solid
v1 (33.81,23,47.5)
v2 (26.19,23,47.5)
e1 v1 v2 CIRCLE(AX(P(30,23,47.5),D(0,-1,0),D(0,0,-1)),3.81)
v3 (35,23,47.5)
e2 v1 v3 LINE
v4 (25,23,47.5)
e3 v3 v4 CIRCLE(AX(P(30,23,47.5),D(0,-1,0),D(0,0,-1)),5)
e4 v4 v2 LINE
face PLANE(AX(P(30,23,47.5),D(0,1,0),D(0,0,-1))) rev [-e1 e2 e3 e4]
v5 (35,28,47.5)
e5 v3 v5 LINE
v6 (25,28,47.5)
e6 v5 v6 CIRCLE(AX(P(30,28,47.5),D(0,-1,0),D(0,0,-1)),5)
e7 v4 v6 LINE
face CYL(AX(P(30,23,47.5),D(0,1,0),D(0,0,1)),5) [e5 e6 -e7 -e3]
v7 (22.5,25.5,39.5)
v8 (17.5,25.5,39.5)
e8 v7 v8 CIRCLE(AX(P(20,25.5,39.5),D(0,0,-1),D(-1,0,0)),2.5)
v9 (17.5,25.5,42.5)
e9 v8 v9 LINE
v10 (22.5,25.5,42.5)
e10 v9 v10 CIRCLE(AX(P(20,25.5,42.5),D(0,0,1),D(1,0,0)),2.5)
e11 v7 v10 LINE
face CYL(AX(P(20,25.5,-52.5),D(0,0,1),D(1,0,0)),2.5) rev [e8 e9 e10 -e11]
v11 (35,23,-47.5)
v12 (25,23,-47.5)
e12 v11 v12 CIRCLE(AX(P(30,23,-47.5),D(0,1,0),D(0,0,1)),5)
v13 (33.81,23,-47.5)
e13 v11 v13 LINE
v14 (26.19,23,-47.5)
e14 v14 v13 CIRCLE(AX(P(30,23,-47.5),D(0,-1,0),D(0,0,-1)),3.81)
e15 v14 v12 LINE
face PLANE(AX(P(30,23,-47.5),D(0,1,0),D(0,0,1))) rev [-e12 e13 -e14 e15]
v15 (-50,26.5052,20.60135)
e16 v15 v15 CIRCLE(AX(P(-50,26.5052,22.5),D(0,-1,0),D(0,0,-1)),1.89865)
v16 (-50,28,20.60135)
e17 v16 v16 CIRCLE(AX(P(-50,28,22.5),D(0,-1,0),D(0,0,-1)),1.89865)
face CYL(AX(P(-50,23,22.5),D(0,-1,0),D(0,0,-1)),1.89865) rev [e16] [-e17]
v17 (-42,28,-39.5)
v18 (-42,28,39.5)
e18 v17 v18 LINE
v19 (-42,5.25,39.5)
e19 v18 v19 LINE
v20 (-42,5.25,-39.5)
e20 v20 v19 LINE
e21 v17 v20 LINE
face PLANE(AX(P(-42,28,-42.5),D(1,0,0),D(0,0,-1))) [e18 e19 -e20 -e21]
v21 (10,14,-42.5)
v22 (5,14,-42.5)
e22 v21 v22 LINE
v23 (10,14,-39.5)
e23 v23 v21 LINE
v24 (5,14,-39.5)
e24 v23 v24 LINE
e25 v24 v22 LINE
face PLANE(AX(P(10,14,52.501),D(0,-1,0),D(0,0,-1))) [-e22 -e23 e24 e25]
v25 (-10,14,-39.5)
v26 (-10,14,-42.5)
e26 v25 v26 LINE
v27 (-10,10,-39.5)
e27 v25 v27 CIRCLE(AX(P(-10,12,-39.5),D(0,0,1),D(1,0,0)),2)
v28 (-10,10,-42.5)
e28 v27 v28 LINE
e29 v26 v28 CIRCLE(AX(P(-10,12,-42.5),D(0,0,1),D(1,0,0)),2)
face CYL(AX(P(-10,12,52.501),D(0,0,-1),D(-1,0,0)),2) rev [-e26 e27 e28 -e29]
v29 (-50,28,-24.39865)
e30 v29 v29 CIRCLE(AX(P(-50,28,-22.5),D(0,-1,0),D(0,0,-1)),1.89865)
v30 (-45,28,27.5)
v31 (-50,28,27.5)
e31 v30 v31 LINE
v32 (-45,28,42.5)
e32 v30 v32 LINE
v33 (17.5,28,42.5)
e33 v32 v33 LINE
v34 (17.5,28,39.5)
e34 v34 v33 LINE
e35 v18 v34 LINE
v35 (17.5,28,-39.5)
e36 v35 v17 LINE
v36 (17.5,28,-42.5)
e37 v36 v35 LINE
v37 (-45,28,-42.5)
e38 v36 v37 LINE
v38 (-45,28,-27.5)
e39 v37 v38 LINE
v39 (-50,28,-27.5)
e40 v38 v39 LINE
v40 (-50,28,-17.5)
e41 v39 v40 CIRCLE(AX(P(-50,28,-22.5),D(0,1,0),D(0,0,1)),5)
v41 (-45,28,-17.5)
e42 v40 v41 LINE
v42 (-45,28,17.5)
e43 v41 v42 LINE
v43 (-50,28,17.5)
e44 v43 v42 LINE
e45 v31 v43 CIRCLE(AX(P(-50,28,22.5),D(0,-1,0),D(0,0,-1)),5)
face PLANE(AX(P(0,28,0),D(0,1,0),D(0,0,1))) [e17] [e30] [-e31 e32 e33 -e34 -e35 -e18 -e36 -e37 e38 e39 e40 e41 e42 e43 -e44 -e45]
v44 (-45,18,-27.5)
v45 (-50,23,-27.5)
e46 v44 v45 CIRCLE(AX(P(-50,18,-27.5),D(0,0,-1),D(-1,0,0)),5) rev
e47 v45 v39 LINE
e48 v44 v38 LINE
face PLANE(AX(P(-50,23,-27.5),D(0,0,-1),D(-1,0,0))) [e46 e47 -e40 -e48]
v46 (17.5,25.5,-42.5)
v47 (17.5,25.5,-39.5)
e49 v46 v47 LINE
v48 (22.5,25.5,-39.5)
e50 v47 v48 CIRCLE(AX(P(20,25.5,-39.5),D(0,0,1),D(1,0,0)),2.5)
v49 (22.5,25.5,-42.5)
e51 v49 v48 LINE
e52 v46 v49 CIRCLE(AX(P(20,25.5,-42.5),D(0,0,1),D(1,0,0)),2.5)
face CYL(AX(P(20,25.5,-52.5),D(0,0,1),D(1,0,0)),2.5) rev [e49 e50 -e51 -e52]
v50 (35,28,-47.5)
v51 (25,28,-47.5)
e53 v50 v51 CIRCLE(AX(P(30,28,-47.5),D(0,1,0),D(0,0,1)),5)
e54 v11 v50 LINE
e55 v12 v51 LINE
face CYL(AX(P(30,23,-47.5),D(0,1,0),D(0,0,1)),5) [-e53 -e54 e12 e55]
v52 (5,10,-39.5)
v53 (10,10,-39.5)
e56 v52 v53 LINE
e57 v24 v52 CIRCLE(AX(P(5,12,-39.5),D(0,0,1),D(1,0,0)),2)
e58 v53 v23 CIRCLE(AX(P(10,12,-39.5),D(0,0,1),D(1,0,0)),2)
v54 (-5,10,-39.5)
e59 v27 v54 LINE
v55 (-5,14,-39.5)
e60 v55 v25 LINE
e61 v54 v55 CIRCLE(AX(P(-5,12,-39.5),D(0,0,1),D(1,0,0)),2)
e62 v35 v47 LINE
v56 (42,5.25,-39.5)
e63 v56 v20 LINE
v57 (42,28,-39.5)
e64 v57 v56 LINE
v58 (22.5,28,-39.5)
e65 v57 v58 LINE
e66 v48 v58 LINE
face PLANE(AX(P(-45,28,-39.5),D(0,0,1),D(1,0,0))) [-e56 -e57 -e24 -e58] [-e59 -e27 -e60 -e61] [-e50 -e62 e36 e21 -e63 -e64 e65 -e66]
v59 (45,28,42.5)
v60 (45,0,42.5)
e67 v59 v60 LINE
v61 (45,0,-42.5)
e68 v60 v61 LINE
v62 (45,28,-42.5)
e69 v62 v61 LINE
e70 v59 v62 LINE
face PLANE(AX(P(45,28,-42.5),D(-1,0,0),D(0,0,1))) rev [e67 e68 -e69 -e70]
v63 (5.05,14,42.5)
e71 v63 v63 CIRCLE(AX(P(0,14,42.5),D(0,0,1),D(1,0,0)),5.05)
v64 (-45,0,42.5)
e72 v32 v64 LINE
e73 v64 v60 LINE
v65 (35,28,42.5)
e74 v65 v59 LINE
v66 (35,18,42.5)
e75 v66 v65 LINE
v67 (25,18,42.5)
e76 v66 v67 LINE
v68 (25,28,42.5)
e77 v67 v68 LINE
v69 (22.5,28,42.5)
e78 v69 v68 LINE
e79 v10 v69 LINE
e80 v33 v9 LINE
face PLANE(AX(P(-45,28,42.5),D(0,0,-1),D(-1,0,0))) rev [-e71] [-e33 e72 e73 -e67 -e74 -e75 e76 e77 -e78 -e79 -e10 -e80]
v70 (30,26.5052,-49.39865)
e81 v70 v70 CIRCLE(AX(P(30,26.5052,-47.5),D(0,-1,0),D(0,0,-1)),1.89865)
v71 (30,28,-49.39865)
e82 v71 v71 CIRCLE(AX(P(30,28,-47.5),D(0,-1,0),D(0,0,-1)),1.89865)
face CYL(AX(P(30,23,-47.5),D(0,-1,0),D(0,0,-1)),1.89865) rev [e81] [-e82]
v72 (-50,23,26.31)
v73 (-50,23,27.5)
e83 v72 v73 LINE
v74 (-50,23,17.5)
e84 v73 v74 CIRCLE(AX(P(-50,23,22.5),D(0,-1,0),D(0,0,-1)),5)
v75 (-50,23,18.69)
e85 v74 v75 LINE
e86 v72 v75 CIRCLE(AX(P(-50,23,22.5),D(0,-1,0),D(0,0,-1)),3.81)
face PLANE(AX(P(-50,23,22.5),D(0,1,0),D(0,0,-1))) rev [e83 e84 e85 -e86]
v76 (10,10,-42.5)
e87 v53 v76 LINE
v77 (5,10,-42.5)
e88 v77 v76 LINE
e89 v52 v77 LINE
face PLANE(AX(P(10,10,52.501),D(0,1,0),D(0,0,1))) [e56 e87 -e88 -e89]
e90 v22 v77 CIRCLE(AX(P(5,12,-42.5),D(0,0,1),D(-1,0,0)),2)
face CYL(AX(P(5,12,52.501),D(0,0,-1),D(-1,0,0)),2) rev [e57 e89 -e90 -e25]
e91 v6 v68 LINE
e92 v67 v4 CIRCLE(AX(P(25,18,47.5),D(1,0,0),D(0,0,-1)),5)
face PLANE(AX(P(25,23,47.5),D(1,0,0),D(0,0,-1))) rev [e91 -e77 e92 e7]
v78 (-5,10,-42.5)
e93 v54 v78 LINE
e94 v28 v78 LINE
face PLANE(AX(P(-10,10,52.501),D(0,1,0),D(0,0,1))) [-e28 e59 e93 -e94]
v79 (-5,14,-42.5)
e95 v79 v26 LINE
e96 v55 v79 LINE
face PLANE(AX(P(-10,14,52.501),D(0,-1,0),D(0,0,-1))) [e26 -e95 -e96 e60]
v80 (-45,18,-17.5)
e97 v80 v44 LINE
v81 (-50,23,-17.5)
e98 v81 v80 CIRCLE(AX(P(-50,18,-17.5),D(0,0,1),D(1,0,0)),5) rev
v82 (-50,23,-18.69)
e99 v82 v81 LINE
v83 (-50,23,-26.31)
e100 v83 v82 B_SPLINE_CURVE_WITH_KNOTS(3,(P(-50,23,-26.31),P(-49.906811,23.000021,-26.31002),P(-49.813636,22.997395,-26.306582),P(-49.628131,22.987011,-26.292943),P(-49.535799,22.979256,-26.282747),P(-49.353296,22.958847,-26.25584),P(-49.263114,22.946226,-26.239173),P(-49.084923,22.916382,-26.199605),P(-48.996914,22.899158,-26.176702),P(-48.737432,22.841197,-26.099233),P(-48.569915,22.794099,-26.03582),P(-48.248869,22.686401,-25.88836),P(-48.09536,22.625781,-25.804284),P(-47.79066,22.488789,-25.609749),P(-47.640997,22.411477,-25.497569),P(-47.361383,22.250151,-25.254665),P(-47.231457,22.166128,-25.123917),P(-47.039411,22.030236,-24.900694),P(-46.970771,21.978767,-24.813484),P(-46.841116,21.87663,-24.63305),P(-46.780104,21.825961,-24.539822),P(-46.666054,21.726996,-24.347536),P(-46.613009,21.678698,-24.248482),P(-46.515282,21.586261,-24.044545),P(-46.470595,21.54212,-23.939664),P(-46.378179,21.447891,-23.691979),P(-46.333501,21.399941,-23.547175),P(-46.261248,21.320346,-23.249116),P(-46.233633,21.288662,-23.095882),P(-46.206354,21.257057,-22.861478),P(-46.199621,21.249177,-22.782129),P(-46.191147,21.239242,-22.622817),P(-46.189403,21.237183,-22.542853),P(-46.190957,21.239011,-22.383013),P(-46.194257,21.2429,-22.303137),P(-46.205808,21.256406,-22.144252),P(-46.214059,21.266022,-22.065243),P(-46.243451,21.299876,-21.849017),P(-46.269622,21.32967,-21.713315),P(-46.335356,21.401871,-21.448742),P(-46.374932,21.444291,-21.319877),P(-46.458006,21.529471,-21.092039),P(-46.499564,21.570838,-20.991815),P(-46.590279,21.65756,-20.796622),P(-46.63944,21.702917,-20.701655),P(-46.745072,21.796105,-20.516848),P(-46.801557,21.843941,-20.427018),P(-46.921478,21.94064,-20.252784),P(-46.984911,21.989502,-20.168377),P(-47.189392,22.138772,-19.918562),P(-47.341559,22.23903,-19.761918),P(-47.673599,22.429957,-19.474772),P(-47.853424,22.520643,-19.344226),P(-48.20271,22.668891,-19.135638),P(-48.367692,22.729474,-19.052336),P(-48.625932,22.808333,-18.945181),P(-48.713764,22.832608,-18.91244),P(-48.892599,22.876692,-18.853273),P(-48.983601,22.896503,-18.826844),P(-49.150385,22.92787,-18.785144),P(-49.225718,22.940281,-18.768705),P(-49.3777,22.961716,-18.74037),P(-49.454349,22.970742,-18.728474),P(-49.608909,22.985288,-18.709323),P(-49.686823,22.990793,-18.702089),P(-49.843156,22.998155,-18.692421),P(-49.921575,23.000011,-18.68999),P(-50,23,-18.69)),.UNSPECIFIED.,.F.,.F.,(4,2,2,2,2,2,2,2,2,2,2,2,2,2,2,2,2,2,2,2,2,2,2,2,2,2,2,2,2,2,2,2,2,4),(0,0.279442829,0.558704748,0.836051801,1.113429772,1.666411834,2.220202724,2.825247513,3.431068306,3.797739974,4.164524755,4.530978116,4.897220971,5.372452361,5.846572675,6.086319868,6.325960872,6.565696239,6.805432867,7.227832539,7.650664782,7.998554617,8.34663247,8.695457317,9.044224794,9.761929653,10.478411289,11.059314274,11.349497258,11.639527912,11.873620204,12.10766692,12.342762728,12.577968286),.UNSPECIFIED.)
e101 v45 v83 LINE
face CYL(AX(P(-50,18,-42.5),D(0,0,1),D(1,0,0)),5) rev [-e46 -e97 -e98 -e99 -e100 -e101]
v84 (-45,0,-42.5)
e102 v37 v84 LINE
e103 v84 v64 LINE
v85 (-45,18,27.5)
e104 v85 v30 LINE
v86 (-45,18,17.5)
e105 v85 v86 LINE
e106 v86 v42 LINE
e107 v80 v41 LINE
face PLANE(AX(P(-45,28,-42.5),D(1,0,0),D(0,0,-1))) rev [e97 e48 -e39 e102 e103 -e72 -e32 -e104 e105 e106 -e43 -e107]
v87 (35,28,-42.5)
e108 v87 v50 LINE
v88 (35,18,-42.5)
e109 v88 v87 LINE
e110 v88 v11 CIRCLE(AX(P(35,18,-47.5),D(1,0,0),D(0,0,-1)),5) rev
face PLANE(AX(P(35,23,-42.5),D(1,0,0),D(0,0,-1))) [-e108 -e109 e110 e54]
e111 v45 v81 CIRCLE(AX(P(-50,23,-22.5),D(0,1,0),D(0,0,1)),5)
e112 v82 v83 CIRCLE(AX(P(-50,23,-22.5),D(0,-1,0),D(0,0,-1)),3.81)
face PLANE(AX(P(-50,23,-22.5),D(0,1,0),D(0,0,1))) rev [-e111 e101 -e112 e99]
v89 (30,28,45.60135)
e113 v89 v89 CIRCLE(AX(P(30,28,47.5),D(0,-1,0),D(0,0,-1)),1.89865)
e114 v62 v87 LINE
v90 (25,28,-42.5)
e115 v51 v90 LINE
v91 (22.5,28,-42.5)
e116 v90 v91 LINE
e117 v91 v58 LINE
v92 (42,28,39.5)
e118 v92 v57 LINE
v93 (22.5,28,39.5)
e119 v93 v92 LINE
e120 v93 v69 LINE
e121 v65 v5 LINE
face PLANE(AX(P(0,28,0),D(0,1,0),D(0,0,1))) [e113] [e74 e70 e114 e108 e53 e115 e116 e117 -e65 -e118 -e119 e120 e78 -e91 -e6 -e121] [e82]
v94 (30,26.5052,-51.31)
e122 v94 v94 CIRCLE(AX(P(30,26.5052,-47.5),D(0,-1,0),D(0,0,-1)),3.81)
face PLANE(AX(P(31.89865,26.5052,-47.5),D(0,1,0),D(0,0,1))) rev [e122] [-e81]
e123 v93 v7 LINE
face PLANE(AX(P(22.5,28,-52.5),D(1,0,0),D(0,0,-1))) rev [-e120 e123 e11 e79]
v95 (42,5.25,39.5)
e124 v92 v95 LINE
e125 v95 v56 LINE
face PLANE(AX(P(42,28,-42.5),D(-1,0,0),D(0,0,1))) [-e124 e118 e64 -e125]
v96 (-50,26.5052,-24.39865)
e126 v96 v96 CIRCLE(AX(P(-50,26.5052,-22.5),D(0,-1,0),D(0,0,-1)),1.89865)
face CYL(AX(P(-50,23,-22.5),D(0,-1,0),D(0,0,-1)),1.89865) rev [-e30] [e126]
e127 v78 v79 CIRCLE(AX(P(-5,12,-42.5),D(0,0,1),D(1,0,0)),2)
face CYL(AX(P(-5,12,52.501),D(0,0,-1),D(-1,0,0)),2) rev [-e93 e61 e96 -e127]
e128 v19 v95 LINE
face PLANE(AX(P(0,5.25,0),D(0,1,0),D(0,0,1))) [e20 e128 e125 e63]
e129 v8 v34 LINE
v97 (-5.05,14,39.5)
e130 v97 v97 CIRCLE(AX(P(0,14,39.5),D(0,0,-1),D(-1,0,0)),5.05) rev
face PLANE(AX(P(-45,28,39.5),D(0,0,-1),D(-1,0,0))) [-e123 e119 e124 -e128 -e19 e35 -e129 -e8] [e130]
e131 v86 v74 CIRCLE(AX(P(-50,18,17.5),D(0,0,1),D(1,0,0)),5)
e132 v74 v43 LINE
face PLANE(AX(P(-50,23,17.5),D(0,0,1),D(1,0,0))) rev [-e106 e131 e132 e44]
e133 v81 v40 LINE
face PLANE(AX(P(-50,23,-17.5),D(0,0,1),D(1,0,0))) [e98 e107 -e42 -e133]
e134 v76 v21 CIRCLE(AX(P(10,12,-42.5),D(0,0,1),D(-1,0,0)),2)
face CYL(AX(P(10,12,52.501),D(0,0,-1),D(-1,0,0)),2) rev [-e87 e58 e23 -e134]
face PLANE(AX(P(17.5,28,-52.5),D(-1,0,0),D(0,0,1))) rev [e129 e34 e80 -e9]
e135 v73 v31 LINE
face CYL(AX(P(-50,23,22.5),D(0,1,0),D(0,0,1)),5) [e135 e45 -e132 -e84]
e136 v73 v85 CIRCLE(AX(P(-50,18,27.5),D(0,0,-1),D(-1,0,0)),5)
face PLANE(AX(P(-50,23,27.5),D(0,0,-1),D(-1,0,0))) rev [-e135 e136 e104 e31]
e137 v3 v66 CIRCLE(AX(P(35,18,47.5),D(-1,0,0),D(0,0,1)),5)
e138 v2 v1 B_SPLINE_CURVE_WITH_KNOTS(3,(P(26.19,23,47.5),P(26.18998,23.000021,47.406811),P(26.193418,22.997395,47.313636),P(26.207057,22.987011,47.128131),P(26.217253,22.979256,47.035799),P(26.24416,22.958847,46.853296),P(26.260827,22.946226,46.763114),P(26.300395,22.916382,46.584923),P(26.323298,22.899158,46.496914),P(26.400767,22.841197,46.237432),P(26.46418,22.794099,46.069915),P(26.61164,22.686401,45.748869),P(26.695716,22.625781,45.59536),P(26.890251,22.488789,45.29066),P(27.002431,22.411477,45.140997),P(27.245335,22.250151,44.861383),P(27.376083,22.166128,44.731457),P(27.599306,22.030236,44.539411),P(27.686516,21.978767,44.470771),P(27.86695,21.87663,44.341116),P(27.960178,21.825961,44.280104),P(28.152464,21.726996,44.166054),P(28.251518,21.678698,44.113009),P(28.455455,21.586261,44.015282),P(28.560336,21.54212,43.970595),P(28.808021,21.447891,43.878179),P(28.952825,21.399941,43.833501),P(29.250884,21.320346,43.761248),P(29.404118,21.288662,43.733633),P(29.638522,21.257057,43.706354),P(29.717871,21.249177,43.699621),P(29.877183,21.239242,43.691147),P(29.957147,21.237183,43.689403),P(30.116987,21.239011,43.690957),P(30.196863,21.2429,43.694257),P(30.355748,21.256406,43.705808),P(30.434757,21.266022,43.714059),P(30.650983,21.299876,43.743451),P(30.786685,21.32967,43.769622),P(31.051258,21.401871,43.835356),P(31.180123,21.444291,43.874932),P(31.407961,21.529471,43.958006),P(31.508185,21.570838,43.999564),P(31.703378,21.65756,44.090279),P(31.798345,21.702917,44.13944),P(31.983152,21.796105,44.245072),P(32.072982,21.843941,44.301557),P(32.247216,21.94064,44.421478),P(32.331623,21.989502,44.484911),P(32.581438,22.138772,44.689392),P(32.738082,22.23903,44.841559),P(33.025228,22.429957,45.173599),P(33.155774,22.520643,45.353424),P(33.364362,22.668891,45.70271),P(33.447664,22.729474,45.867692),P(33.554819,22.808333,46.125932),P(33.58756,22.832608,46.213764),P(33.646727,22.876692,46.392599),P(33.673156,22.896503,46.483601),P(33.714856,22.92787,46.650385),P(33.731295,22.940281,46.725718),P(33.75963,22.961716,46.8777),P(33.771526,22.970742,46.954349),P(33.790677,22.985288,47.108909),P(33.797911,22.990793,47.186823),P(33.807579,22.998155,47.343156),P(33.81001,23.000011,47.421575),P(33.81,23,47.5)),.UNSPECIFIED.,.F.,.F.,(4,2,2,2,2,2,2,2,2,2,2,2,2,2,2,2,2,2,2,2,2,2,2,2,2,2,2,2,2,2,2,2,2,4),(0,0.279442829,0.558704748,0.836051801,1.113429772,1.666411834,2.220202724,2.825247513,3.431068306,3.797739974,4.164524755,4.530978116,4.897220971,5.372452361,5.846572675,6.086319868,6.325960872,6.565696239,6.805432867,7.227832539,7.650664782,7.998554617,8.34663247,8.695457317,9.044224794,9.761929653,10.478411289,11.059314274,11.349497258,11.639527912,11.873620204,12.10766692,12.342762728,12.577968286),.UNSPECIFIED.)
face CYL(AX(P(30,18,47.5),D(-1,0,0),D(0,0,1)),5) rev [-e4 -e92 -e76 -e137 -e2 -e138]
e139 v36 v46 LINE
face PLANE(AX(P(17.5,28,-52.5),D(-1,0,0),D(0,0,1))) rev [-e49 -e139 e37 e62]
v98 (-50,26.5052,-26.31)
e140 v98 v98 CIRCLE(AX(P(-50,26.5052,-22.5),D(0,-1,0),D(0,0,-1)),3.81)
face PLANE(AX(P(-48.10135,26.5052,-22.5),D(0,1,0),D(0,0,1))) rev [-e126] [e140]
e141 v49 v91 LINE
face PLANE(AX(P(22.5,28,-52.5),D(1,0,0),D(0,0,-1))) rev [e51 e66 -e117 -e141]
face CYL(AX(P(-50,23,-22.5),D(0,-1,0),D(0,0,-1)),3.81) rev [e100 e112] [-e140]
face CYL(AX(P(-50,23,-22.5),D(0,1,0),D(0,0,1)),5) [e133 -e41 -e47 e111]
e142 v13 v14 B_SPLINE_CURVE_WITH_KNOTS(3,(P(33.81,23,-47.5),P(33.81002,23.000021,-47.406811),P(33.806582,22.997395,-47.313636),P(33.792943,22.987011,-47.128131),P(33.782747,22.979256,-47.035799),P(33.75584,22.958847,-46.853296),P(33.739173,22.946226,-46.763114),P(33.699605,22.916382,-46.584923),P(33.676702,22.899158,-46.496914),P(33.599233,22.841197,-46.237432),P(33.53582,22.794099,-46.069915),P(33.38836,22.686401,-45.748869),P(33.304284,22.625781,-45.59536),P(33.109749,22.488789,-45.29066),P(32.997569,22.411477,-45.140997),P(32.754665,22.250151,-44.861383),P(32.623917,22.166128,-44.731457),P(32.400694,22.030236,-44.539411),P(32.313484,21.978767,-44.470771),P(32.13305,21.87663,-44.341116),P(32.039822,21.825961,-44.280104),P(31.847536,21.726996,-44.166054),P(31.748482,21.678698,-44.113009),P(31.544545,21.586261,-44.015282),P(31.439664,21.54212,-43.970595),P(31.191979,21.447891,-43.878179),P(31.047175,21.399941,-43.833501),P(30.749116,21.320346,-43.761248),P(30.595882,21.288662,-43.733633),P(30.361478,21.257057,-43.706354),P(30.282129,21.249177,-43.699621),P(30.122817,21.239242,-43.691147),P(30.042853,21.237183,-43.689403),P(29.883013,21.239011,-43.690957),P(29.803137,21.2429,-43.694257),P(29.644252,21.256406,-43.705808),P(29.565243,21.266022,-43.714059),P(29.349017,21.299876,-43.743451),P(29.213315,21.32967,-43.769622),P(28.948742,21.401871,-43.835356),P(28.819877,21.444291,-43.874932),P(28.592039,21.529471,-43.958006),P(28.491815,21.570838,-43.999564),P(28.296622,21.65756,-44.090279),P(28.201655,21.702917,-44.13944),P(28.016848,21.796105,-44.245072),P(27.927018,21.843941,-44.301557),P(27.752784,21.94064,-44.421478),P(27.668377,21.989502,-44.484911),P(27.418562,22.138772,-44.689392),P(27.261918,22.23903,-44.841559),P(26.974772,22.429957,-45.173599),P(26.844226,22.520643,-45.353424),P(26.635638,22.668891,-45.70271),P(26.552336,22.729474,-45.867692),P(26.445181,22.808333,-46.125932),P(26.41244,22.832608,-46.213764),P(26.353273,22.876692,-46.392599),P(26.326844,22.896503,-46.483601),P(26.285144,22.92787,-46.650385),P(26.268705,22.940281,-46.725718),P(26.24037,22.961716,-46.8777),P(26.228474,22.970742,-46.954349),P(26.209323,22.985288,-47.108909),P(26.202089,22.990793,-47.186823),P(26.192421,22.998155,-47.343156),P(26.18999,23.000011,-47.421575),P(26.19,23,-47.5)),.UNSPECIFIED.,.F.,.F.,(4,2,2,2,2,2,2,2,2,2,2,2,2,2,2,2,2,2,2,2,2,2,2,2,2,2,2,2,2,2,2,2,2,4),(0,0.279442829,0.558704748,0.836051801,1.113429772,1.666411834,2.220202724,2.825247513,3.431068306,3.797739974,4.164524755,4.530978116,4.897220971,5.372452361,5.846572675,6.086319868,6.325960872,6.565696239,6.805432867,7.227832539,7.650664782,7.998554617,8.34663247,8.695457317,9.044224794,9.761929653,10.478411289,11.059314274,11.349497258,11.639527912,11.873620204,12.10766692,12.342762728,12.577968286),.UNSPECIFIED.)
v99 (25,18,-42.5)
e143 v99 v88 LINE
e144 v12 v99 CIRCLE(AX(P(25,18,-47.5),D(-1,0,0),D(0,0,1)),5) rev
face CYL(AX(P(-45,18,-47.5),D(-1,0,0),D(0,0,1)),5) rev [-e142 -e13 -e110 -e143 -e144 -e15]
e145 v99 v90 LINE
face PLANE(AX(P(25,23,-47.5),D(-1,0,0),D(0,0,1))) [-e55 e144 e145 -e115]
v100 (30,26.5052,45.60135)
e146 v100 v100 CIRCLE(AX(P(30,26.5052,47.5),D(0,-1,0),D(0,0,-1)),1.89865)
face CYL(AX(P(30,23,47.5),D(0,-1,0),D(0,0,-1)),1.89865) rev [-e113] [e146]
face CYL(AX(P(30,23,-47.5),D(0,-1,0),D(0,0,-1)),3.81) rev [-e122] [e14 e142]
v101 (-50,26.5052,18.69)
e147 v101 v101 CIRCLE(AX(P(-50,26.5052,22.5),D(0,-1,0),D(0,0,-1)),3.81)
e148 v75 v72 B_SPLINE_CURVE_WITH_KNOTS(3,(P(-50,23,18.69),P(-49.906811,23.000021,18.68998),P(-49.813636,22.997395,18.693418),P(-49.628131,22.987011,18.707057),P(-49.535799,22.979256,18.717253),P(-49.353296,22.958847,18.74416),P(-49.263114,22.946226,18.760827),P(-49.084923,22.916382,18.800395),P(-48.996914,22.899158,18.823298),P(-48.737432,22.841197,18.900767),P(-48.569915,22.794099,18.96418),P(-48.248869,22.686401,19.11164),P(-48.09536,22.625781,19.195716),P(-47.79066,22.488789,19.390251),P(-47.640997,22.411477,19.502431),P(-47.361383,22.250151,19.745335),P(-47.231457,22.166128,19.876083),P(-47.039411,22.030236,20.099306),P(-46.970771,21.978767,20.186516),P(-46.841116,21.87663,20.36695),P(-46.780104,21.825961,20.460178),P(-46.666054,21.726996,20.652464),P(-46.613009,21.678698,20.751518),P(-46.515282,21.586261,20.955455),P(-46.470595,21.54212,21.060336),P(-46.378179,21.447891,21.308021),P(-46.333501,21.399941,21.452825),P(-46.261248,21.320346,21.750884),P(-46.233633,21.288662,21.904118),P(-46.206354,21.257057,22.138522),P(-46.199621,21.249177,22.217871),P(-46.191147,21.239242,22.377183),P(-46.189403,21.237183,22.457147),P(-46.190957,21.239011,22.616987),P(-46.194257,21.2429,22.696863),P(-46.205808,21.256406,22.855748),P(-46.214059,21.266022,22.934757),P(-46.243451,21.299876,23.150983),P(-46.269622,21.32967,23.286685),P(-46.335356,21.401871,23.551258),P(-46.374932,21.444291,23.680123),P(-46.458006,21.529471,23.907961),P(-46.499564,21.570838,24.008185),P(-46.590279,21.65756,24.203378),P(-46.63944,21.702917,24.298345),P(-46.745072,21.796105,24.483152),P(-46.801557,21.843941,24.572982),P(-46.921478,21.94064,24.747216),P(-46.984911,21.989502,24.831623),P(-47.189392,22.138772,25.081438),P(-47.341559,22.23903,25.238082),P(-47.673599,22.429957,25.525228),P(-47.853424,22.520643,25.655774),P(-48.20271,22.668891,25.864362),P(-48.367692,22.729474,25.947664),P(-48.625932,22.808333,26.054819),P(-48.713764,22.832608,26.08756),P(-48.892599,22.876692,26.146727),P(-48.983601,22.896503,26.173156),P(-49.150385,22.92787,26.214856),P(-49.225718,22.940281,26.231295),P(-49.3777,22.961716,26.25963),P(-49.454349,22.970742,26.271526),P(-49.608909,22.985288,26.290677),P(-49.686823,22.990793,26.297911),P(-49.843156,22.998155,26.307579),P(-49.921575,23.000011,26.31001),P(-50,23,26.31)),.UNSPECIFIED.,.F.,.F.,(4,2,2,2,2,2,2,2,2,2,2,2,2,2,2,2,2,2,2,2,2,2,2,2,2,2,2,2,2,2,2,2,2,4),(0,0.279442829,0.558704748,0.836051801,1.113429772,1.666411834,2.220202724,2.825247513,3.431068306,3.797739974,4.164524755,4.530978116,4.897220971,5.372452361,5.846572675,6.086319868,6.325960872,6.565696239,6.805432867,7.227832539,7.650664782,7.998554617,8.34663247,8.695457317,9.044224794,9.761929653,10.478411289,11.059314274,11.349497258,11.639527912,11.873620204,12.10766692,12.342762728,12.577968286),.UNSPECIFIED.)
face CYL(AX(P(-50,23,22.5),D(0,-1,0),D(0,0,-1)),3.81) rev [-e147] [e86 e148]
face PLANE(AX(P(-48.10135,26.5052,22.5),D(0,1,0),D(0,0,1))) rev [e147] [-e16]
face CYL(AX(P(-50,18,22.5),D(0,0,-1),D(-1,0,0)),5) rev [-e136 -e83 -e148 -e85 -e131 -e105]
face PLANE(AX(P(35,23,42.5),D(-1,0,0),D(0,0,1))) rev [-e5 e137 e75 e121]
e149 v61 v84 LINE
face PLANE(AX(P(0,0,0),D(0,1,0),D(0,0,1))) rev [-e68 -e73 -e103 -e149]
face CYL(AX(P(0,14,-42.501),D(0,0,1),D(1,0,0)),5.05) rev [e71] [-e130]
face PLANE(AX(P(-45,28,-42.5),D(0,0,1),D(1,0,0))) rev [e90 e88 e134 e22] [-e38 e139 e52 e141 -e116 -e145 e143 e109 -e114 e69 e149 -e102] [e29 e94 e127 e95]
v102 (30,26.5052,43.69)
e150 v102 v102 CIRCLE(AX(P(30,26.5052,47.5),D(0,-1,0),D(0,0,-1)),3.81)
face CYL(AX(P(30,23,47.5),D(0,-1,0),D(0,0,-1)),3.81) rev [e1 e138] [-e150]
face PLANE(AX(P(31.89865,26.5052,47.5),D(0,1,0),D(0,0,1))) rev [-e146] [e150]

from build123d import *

# Parameters (mm, degrees)
SKETCH1_W                                      = 90
SKETCH1_H                                      = 85
BOSS_EXTRUDE1_DEPTH                            = 28
SHELL1_T                                       = -3
SHELL1_THICKNESS_2_FACE_W                      = 79
SHELL1_THICKNESS_2_FACE_H                      = 84
SHELL1_THICKNESS_2_DEPTH                       = 2.25
CUT_EXTRUDE1_REACH                             = 102.17
SKETCH2_R                                      = 5.05
BOSS_EXTRUDE2_DEPTH                            = 5
BOSS_EXTRUDE3_DEPTH                            = 5
CBORE_FOR_6_SOCKET_HEAD_CAP_SCREW1_D           = 3.7973
CBORE_FOR_6_SOCKET_HEAD_CAP_SCREW1_CBORE_D     = 7.62
CBORE_FOR_6_SOCKET_HEAD_CAP_SCREW1_CBORE_DEPTH = 3.5052
FILLET1_R                                      = 5
CUT_EXTRUDE2_DEPTH                             = 114.287245531
CUT_EXTRUDE4_REACH                             = 124.741


with BuildPart() as part:
    # Sketch1 → Boss-Extrude1 (new body)
    with BuildSketch(Plane(origin=(0, 0, 0), x_dir=(1, 0, 0), z_dir=(0, 1, 0))):
        Rectangle(SKETCH1_W, SKETCH1_H)
    extrude(amount=BOSS_EXTRUDE1_DEPTH)

    # Shell1
    shell1_openings = [part.faces().sort_by_distance(p)[0] for p in [
        (0, 28, 0),
    ]]
    offset(amount=SHELL1_T, openings=shell1_openings, kind=Kind.INTERSECTION)

    # Shell1 thickness 2 face (on inner face of the shell) → Shell1 thickness 2 (add)
    with BuildSketch(Plane(origin=(0, 3, 0), x_dir=(0, 0, -1), z_dir=(0, -1, 0))):
        Rectangle(SHELL1_THICKNESS_2_FACE_W, SHELL1_THICKNESS_2_FACE_H)
    extrude(amount=-SHELL1_THICKNESS_2_DEPTH)

    # Sketch2 → Cut-Extrude1 (cut, up to next)
    with BuildSketch(Plane.XY.offset(42.5), mode=Mode.PRIVATE) as cut_extrude1_sk1:
        with Locations((0, 14)):
            Circle(SKETCH2_R)
    cut_extrude1_tool1 = extrude(cut_extrude1_sk1.sketch, amount=-CUT_EXTRUDE1_REACH, mode=Mode.PRIVATE) & part.part
    add(cut_extrude1_tool1.solids().sort_by_distance((0, 14, 42.5))[0], mode=Mode.SUBTRACT)

    # Sketch3 → Boss-Extrude2 (add)
    with BuildSketch(Plane(origin=(0, 28, 0), x_dir=(1, 0, 0), z_dir=(0, 1, 0))):
        with BuildLine():
            Line((-50, 27.5), (-45, 27.5))
            Line((-45, 27.5), (-45, 17.5))
            Line((-45, 17.5), (-50, 17.5))
            ThreePointArc((-50, 17.5), (-55, 22.5), (-50, 27.5))
        make_face()
    boss_extrude2 = extrude(amount=-BOSS_EXTRUDE2_DEPTH)

    # Mirror1: Boss-Extrude2 across plane
    add(boss_extrude2.mirror(Plane.XY))

    # Sketch4 → Boss-Extrude3 (add)
    with BuildSketch(Plane(origin=(0, 28, 0), x_dir=(1, 0, 0), z_dir=(0, 1, 0))):
        with BuildLine():
            Line((25, 47.5), (25, 42.5))
            Line((25, 42.5), (35, 42.5))
            Line((35, 42.5), (35, 47.5))
            ThreePointArc((35, 47.5), (30, 52.5), (25, 47.5))
        make_face()
    boss_extrude3 = extrude(amount=-BOSS_EXTRUDE3_DEPTH)

    # Mirror2: Boss-Extrude3 across plane
    add(boss_extrude3.mirror(Plane.XY))

    # CBORE for #6 Socket Head Cap Screw1 (through all)
    with Locations(Plane(origin=(0, 23, 0), x_dir=(-1, 0, 0), z_dir=(0, -1, 0))):
        with Locations((-30, 47.5), (-30, -47.5), (50, -22.5), (50, 22.5)):
            CounterBoreHole(CBORE_FOR_6_SOCKET_HEAD_CAP_SCREW1_D / 2, CBORE_FOR_6_SOCKET_HEAD_CAP_SCREW1_CBORE_D / 2, CBORE_FOR_6_SOCKET_HEAD_CAP_SCREW1_CBORE_DEPTH)

    # Fillet1
    # the kernel refuses this fillet: 5 mm, written as the material it adds along each edge
    with BuildSketch(Plane(origin=(25, 23, -42.5), x_dir=(0, -1, 0), z_dir=(1, 0, 0))) as fillet1_piece_1_section:
        with BuildLine():
            CenterArc((FILLET1_R, FILLET1_R), FILLET1_R, 180, 90)
            Line((0, FILLET1_R), (0, 0))
            Line((0, 0), (FILLET1_R, 0))
        make_face()
    fillet1_piece_1 = extrude(amount=10, mode=Mode.PRIVATE)
    fillet1_piece_1 = fillet1_piece_1 - Plane(origin=(30, 21.803509944, -47.5), x_dir=(-1, 0, 0), z_dir=(0, -1, 0)) * Cylinder(3.81, 40, mode=Mode.PRIVATE)
    add(fillet1_piece_1)
    with BuildSketch(Plane(origin=(25, 23, 42.5), x_dir=(0, -1, 0), z_dir=(1, 0, 0))) as fillet1_piece_2_section:
        with BuildLine():
            CenterArc((FILLET1_R, -FILLET1_R), FILLET1_R, 90, 90)
            Line((0, -FILLET1_R), (0, 0))
            Line((0, 0), (FILLET1_R, 0))
        make_face()
    fillet1_piece_2 = extrude(amount=10, mode=Mode.PRIVATE)
    fillet1_piece_2 = fillet1_piece_2 - Plane(origin=(30, 21.803509344, 47.5), x_dir=(-1, 0, 0), z_dir=(0, -1, 0)) * Cylinder(3.81, 40, mode=Mode.PRIVATE)
    add(fillet1_piece_2)
    with BuildSketch(Plane(origin=(-45, 23, -27.5), x_dir=(0, -1, 0), z_dir=(0, 0, 1))) as fillet1_piece_3_section:
        with BuildLine():
            CenterArc((FILLET1_R, -FILLET1_R), FILLET1_R, 90, 90)
            Line((0, -FILLET1_R), (0, 0))
            Line((0, 0), (FILLET1_R, 0))
        make_face()
    fillet1_piece_3 = extrude(amount=10, mode=Mode.PRIVATE)
    fillet1_piece_3 = fillet1_piece_3 - Plane(origin=(-50, 21.803509344, -22.5), x_dir=(-1, 0, 0), z_dir=(0, -1, 0)) * Cylinder(3.81, 40, mode=Mode.PRIVATE)
    add(fillet1_piece_3)
    with BuildSketch(Plane(origin=(-45, 23, 27.5), x_dir=(0, -1, 0), z_dir=(0, 0, -1))) as fillet1_piece_4_section:
        with BuildLine():
            CenterArc((FILLET1_R, FILLET1_R), FILLET1_R, 180, 90)
            Line((0, FILLET1_R), (0, 0))
            Line((0, 0), (FILLET1_R, 0))
        make_face()
    fillet1_piece_4 = extrude(amount=10, mode=Mode.PRIVATE)
    fillet1_piece_4 = fillet1_piece_4 - Plane(origin=(-50, 21.803509944, 22.5), x_dir=(-1, 0, 0), z_dir=(0, -1, 0)) * Cylinder(3.81, 40, mode=Mode.PRIVATE)
    add(fillet1_piece_4)

    # Sketch9 → Cut-Extrude2 (cut, through all)
    with BuildSketch(Plane.XY.offset(42.5)):
        with BuildLine():
            Line((22.5, 28), (22.5, 25.5))
            ThreePointArc((22.5, 25.5), (20, 23), (17.5, 25.5))
            Line((17.5, 25.5), (17.5, 28))
            ThreePointArc((17.5, 28), (20, 30.5), (22.5, 28))
        make_face()
    extrude(amount=-CUT_EXTRUDE2_DEPTH, mode=Mode.SUBTRACT)

    # Sketch10 → Cut-Extrude4 (cut, up to next)
    with BuildSketch(Plane(origin=(17.5, 0, -42.5), x_dir=(1, 0, 0), z_dir=(0, 0, 1)), mode=Mode.PRIVATE) as cut_extrude4_sk1:
        with BuildLine():
            Line((-27.5, 14), (-22.5, 14))
            ThreePointArc((-22.5, 14), (-20.5, 12), (-22.5, 10))
            Line((-22.5, 10), (-27.5, 10))
            ThreePointArc((-27.5, 10), (-29.5, 12), (-27.5, 14))
        make_face()
    cut_extrude4_tool1 = extrude(cut_extrude4_sk1.sketch, amount=CUT_EXTRUDE4_REACH, mode=Mode.PRIVATE) & part.part
    # Sketch10 → Cut-Extrude4 (cut, up to next)
    with BuildSketch(Plane(origin=(17.5, 0, -42.5), x_dir=(1, 0, 0), z_dir=(0, 0, 1)), mode=Mode.PRIVATE) as cut_extrude4_sk2:
        with BuildLine():
            Line((-7.5, 14), (-12.5, 14))
            ThreePointArc((-12.5, 14), (-14.5, 12), (-12.5, 10))
            Line((-12.5, 10), (-7.5, 10))
            ThreePointArc((-7.5, 10), (-5.5, 12), (-7.5, 14))
        make_face()
    cut_extrude4_tool2 = extrude(cut_extrude4_sk2.sketch, amount=CUT_EXTRUDE4_REACH, mode=Mode.PRIVATE) & part.part
    add(cut_extrude4_tool1.solids().sort_by_distance((-7.5, 12, -42.5))[0], mode=Mode.SUBTRACT)
    add(cut_extrude4_tool2.solids().sort_by_distance((7.5, 12, -42.5))[0], mode=Mode.SUBTRACT)


solid = part.part
